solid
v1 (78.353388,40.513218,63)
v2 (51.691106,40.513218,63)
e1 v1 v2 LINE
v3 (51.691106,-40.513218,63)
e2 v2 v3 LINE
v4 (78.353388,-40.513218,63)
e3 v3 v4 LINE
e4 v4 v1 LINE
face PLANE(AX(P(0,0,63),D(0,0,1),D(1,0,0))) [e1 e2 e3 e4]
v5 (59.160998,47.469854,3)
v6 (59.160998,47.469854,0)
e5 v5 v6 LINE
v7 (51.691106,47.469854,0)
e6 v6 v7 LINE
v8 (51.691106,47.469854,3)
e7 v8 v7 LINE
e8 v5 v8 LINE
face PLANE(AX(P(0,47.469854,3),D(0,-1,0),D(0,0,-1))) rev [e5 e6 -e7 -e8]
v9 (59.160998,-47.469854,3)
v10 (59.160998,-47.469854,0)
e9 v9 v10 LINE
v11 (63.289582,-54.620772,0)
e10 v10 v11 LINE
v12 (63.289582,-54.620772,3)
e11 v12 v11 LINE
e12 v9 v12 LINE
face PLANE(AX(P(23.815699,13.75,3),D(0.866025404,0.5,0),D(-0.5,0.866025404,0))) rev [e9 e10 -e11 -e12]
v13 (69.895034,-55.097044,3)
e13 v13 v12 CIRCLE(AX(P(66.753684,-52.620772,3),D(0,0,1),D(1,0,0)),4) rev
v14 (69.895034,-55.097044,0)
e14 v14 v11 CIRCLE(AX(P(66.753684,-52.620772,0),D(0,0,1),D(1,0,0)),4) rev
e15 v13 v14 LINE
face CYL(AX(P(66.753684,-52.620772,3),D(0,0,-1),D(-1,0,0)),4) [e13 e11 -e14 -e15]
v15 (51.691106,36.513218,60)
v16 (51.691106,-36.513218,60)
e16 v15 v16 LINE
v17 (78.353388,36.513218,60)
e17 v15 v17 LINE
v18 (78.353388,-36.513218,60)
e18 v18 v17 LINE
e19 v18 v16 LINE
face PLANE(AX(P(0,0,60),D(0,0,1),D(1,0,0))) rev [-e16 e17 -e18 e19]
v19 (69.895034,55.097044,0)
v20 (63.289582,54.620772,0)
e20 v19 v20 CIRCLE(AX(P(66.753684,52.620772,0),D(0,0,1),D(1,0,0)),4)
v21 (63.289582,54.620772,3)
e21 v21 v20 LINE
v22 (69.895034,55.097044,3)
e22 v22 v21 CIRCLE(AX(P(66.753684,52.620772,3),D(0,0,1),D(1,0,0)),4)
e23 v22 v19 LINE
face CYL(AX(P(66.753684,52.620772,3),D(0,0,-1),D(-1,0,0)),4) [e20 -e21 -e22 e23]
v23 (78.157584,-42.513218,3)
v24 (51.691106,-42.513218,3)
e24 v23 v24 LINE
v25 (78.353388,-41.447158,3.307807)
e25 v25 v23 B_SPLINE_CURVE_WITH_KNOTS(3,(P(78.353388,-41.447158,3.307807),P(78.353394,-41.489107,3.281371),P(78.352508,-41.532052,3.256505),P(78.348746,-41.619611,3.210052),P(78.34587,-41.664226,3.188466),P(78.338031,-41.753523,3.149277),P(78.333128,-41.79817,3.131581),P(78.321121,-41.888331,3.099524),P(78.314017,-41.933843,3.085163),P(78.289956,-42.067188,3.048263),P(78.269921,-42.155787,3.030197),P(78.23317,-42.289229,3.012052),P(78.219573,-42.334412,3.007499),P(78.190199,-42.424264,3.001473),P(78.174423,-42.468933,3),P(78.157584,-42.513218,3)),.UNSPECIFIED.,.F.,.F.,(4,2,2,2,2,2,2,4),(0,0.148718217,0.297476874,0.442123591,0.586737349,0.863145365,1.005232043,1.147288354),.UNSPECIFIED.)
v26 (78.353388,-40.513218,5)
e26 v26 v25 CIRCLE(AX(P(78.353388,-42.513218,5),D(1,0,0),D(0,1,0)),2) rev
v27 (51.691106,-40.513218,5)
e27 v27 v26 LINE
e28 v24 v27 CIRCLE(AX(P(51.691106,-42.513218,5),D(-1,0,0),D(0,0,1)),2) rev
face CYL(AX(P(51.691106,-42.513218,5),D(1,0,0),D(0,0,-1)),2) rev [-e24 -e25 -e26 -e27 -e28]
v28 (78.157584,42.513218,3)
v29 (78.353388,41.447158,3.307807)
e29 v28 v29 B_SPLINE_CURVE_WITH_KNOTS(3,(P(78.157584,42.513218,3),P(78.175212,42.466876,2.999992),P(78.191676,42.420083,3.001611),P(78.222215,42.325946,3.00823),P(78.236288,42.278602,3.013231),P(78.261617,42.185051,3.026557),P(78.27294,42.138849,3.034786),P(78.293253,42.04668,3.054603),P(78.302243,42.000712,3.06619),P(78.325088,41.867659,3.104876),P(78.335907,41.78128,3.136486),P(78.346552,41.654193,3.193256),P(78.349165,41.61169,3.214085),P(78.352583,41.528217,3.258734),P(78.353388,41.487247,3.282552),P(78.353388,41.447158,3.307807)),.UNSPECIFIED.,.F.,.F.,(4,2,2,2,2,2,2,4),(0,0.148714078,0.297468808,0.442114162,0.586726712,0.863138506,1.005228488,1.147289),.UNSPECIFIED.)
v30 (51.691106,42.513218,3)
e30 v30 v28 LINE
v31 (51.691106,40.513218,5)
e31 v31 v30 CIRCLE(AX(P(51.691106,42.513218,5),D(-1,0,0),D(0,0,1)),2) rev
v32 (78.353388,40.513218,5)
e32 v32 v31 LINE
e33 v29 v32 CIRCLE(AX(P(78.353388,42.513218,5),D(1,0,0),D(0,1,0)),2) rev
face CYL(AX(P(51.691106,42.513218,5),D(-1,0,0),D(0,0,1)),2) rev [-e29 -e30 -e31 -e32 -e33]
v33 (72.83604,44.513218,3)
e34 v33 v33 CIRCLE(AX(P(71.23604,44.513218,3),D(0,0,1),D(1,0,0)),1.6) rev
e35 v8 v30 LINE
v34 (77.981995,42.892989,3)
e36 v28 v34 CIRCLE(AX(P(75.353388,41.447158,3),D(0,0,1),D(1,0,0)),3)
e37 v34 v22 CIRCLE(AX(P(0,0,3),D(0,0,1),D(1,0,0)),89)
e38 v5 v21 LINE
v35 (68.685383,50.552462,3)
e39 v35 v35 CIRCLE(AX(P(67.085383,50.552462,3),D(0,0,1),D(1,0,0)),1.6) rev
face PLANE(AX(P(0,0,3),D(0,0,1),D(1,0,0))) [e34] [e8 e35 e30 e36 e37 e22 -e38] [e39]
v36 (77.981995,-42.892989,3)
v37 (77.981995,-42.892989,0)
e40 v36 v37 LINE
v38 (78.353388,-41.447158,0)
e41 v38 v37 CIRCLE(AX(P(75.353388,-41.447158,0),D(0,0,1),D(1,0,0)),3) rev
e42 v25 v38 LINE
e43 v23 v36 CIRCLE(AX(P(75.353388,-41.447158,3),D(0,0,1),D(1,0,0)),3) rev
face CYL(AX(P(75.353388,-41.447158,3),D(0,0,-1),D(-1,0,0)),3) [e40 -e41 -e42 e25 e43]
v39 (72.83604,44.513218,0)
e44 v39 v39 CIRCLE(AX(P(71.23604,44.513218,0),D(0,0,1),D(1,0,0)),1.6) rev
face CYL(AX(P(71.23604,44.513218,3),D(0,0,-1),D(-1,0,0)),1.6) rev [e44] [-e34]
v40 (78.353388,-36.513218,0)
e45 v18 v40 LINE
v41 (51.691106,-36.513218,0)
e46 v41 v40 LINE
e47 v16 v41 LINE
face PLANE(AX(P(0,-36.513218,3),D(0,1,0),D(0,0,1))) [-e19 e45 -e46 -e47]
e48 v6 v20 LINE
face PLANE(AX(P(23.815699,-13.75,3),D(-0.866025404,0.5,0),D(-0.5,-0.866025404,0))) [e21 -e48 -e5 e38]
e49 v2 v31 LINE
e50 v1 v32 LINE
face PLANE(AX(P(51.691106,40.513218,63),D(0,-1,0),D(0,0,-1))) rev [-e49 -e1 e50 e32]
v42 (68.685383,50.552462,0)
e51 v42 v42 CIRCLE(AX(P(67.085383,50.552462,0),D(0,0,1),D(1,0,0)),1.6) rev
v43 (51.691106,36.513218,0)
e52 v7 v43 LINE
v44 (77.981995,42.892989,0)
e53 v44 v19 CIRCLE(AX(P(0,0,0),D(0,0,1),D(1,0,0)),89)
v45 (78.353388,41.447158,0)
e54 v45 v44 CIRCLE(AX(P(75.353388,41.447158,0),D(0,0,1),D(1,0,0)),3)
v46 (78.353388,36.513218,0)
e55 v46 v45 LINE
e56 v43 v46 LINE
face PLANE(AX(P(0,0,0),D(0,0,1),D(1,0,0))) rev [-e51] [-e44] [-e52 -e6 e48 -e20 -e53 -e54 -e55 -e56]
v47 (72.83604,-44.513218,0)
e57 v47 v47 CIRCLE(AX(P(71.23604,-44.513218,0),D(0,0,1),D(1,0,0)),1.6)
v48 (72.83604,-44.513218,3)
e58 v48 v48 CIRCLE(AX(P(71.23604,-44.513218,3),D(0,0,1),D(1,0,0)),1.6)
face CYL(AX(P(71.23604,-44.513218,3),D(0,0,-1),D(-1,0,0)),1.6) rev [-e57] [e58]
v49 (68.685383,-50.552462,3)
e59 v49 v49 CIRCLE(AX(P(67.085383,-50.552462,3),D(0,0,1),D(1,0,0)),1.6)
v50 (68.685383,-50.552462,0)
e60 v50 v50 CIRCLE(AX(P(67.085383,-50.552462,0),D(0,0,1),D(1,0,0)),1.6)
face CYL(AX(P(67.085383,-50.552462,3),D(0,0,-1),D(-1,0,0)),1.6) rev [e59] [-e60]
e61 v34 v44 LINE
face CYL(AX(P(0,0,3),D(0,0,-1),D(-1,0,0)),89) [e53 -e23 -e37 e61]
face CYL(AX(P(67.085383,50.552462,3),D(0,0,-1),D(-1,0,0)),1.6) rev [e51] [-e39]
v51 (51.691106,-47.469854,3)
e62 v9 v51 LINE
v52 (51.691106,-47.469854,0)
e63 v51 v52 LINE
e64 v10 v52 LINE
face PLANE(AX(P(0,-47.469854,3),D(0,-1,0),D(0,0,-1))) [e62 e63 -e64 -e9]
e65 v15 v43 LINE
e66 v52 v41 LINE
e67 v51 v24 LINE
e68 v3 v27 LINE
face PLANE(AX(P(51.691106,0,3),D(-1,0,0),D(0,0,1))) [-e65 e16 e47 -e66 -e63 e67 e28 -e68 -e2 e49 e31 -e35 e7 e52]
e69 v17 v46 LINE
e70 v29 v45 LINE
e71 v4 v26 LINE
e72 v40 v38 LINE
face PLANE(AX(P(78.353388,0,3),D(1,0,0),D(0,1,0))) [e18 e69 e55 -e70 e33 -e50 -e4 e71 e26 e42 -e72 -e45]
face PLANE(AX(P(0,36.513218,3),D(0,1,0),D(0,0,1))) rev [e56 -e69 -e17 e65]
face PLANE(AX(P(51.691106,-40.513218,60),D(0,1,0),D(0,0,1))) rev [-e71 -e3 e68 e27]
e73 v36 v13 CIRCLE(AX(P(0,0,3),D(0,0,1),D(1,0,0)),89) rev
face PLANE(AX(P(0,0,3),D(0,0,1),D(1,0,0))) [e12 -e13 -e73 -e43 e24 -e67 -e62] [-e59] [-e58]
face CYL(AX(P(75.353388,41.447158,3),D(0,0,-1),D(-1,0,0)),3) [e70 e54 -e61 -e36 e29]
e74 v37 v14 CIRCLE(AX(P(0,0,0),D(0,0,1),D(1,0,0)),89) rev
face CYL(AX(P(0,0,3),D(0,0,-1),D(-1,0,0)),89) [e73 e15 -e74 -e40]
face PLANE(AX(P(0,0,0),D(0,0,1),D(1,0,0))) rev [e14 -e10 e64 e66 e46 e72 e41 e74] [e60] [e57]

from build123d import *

# Parameters (mm, degrees)
BOSS_EXTRUDE1_OUTLINE_R = 1.6
BOSS_EXTRUDE1_DEPTH     = 3
SKETCH4_W               = 26.662281873
SKETCH4_H               = 4
BOSS_EXTRUDE2_DEPTH     = 57
SKETCH5_W               = 26.662281873
SKETCH5_H               = 81.026436392
BOSS_EXTRUDE3_DEPTH     = 3
FILLET3_R               = 2


# Read off the part's stored shape, not the designer's step: Boss-Extrude1
with BuildPart() as part:
    # Boss-Extrude1 outline → Boss-Extrude1 (new body)
    # profile 1 of 2: a face of its own
    with BuildSketch(Plane.XY):
        with BuildLine():
            ThreePointArc((63.289582375, -54.620772264), (66.466019523, -56.610414999), (69.895033825, -55.0970439))
            ThreePointArc((69.895033825, -55.0970439), (74.189882191, -49.161584399), (77.981994569, -42.892989206))
            ThreePointArc((77.981994569, -42.892989206), (78.25905658, -42.193542837), (78.353388011, -41.447158109))
            Line((78.353388011, -41.447158109), (78.353388011, -36.513218196))
            Line((78.353388011, -36.513218196), (51.691106138, -36.513218196))
            Line((51.691106138, -36.513218196), (51.691106138, -47.469854476))
            Line((51.691106138, -47.469854476), (59.160998066, -47.469854476))
            Line((59.160998066, -47.469854476), (63.289582375, -54.620772264))
        make_face()
        with Locations((67.085382844, -50.552461945)):
            Circle(BOSS_EXTRUDE1_OUTLINE_R, mode=Mode.SUBTRACT)
        with Locations((71.236040077, -44.513218196)):
            Circle(BOSS_EXTRUDE1_OUTLINE_R, mode=Mode.SUBTRACT)
    # profile 2 of 2: a face of its own
    with BuildSketch(Plane.XY):
        with BuildLine():
            Line((78.353388011, 36.513218196), (78.353388011, 41.447158109))
            ThreePointArc((78.353388011, 41.447158109), (78.25905658, 42.193542837), (77.981994569, 42.892989206))
            ThreePointArc((77.981994569, 42.892989206), (74.189882191, 49.161584398), (69.895033826, 55.0970439))
            ThreePointArc((69.895033826, 55.0970439), (66.466019523, 56.610414999), (63.289582375, 54.620772264))
            Line((63.289582375, 54.620772264), (59.160998066, 47.469854476))
            Line((59.160998066, 47.469854476), (51.691106138, 47.469854476))
            Line((51.691106138, 47.469854476), (51.691106138, 36.513218196))
            Line((51.691106138, 36.513218196), (78.353388011, 36.513218196))
        make_face()
        with Locations((67.085382844, 50.552461945)):
            Circle(BOSS_EXTRUDE1_OUTLINE_R, mode=Mode.SUBTRACT)
        with Locations((71.236040077, 44.513218196)):
            Circle(BOSS_EXTRUDE1_OUTLINE_R, mode=Mode.SUBTRACT)
    extrude(amount=BOSS_EXTRUDE1_DEPTH)

    # Sketch4 → Boss-Extrude2 (add)
    with BuildSketch(Plane.XY.offset(3)):
        with Locations((65.022247075, 38.513218196)):
            Rectangle(SKETCH4_W, SKETCH4_H)
        with Locations((65.022247075, -38.513218196)):
            Rectangle(SKETCH4_W, SKETCH4_H)
    extrude(amount=BOSS_EXTRUDE2_DEPTH)

    # Sketch5 → Boss-Extrude3 (add)
    with BuildSketch(Plane.XY.offset(60)):
        with Locations((65.022247075, 0)):
            Rectangle(SKETCH5_W, SKETCH5_H)
    extrude(amount=BOSS_EXTRUDE3_DEPTH)

    # Fillet3
    fillet3_edges = [part.edges().sort_by_distance(p)[0] for p in [
        (65.022247075, -40.513218196, 3),
        (65.022247075, 40.513218196, 3),
    ]]
    fillet(fillet3_edges, radius=FILLET3_R)


solid = part.part
